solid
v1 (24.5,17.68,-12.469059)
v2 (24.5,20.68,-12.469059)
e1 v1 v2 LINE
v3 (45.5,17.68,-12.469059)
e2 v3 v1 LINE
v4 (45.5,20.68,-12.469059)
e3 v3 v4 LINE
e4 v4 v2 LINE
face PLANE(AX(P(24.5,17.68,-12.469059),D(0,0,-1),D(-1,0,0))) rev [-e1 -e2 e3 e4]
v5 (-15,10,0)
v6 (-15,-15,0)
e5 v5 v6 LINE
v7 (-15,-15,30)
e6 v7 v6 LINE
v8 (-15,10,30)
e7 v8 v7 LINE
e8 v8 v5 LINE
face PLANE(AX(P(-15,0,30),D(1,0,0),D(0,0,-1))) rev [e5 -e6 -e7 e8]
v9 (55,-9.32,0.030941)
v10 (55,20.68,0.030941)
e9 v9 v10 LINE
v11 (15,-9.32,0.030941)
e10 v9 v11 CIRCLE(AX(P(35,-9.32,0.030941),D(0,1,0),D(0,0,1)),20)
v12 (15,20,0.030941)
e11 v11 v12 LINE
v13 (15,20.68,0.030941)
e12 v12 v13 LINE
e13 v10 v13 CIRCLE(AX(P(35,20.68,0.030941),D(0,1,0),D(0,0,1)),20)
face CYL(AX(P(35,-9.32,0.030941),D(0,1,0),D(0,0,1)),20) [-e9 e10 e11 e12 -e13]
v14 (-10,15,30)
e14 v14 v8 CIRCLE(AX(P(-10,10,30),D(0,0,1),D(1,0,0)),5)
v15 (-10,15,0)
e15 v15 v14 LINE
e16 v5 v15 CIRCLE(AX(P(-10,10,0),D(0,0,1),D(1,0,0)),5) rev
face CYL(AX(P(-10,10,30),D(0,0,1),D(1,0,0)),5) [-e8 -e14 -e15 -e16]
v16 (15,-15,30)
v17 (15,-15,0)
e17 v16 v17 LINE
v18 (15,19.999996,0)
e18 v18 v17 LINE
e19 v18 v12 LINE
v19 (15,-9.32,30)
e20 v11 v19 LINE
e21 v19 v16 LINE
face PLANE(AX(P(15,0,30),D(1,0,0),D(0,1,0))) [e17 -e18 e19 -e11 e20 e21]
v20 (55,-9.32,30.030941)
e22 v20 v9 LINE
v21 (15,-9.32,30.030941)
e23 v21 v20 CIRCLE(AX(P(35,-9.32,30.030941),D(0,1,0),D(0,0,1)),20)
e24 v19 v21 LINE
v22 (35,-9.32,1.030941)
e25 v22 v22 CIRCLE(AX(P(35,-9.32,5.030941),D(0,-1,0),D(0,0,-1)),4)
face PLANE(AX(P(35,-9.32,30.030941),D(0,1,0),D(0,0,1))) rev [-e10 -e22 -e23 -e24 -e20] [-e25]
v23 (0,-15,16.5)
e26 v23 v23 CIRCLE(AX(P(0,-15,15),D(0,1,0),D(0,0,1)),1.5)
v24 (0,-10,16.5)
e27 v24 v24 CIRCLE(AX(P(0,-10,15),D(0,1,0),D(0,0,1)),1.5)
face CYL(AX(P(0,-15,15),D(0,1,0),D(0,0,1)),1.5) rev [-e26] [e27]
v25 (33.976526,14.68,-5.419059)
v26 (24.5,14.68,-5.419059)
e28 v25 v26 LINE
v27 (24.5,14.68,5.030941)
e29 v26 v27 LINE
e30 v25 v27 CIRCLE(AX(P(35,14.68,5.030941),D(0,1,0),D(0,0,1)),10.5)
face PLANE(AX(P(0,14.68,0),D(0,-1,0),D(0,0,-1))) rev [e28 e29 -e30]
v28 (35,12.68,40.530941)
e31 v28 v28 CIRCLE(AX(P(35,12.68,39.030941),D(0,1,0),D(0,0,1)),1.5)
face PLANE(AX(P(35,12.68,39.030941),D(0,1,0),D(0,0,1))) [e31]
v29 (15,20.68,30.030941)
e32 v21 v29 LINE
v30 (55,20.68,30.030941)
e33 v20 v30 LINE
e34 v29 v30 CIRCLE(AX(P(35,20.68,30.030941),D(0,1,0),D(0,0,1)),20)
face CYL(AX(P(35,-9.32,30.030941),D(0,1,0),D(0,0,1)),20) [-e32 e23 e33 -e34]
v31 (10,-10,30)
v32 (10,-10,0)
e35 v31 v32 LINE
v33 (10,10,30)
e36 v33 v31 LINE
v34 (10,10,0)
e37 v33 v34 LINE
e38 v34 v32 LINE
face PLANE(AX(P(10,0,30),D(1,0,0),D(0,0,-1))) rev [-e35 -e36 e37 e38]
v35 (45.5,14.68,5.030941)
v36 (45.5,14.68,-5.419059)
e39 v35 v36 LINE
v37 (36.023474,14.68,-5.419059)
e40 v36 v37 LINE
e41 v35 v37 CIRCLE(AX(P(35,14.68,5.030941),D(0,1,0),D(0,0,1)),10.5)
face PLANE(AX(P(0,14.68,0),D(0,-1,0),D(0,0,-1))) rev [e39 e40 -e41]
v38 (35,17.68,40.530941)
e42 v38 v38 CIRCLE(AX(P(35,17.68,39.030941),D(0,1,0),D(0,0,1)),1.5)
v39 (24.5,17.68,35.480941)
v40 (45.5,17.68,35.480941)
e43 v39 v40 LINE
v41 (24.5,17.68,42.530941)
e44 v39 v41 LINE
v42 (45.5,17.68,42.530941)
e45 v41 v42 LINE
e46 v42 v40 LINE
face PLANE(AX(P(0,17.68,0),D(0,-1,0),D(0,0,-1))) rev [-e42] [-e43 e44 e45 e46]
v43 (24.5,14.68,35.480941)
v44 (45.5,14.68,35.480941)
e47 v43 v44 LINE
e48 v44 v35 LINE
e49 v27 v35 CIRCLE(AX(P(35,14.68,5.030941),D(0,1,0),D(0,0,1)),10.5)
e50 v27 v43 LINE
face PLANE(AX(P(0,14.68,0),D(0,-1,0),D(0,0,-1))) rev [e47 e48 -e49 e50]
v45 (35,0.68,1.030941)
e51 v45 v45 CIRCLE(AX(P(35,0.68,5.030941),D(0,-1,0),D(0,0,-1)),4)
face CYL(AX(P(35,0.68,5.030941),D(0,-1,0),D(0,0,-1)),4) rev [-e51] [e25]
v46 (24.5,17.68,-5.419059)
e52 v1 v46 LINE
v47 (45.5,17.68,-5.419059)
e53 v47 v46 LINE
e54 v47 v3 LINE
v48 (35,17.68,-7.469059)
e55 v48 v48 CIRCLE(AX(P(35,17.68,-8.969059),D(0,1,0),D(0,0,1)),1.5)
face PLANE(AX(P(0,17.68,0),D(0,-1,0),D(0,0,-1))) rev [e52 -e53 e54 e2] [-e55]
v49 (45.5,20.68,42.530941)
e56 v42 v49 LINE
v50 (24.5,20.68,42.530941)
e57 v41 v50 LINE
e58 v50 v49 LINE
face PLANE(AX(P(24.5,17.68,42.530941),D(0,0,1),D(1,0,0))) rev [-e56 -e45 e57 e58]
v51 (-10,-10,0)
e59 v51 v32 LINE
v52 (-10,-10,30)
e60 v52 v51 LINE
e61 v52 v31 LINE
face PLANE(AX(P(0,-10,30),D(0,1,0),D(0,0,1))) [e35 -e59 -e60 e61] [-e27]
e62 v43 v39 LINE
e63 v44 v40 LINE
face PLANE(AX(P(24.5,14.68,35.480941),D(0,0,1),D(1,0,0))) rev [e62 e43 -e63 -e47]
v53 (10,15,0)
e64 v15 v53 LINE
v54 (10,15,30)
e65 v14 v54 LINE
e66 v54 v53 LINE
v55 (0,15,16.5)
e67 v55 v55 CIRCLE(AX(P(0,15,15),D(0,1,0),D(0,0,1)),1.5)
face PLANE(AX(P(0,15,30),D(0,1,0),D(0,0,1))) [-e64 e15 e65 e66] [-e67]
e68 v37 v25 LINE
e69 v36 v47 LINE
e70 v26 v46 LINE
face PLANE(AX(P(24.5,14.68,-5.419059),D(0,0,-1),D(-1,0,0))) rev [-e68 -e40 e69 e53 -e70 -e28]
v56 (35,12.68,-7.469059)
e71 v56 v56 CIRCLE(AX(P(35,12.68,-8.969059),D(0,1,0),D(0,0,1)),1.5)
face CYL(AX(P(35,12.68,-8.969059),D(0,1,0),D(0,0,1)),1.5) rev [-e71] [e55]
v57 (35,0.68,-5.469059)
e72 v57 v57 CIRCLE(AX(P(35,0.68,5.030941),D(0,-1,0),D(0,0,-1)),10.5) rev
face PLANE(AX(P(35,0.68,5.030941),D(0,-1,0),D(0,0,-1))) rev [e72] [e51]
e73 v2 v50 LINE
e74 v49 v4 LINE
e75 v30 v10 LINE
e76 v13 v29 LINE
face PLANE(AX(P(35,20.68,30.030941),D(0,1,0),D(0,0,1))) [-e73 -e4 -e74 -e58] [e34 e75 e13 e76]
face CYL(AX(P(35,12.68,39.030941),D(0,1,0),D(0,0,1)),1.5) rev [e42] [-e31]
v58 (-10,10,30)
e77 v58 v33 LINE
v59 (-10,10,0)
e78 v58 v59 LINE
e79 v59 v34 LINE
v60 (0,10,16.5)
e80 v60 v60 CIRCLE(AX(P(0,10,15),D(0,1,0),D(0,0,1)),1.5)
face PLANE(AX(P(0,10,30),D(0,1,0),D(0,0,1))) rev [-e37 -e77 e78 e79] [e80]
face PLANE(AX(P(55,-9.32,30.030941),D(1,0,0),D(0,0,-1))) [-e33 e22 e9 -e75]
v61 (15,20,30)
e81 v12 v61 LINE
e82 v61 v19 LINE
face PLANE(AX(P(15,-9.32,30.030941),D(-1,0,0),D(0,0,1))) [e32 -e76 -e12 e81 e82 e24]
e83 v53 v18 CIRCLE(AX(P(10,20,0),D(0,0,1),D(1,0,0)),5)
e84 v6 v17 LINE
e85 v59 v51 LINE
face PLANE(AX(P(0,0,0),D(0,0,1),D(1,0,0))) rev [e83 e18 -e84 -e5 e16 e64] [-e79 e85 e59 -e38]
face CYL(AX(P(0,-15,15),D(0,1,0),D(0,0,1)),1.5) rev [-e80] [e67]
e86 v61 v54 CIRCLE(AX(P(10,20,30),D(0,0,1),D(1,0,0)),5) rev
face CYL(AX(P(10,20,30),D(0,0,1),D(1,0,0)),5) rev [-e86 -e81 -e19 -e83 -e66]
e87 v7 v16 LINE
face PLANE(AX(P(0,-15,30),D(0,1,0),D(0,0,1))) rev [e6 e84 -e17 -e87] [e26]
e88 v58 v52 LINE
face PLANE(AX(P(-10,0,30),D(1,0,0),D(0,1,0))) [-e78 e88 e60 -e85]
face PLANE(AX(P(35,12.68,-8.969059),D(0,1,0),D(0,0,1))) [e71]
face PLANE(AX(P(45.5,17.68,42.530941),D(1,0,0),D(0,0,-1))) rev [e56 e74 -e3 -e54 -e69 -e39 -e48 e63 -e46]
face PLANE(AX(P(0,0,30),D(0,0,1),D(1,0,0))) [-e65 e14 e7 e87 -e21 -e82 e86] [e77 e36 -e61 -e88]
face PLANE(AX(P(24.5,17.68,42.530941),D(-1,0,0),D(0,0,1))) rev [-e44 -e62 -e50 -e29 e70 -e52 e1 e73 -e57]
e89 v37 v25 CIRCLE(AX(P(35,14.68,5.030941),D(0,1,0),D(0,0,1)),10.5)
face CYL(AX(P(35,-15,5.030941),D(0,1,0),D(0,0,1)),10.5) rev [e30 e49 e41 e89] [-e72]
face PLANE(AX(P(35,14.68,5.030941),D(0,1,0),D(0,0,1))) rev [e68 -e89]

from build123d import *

# Parameters (mm, degrees)
SKETCH1_W           = 30
SKETCH1_H           = 30
SKETCH1_W_2         = 20
SKETCH1_H_2         = 20
BOSS_EXTRUDE2_DEPTH = 30
BOSS_EXTRUDE3_DEPTH = 30
SKETCH6_W           = 21
SKETCH6_H           = 55
CUT_EXTRUDE1_DEPTH  = 3
SKETCH7_R           = 1.5
CUT_EXTRUDE2_DEPTH  = 5
SKETCH8_W           = 21
SKETCH8_H           = 40.9
CUT_EXTRUDE3_DEPTH  = 3
SKETCH9_R           = 10.5
CUT_EXTRUDE4_DEPTH  = 81.056214629
BOSS_EXTRUDE4_START = -10
SKETCH10_R          = 10.5
SKETCH10_R_2        = 4
BOSS_EXTRUDE4_DEPTH = 10
FILLET1_DEPTH       = 30
FILLET1_2_DEPTH     = 30
SKETCH11_R          = 1.5
CUT_EXTRUDE6_DEPTH  = 81.175402093


with BuildPart() as part:
    # Sketch1 → Boss-Extrude2 (new body)
    with BuildSketch(Plane.XY):
        Rectangle(SKETCH1_W, SKETCH1_H)
        Rectangle(SKETCH1_W_2, SKETCH1_H_2, mode=Mode.SUBTRACT)
    extrude(amount=BOSS_EXTRUDE2_DEPTH)

    # Sketch5 → Boss-Extrude3 (add)
    with BuildSketch(Plane(origin=(0, 20.68, 0), x_dir=(1, 0, 0), z_dir=(0, 1, 0))):
        with BuildLine():
            Line((15, -30.030941434), (15, -0.030941434))
            ThreePointArc((15, -0.030941434), (35, 19.969058566), (55, -0.030941434))
            Line((55, -0.030941434), (55, -30.030941434))
            ThreePointArc((55, -30.030941434), (35, -50.030941434), (15, -30.030941434))
        make_face()
    extrude(amount=-BOSS_EXTRUDE3_DEPTH)

    # Sketch6 → Cut-Extrude1 (cut)
    with BuildSketch(Plane(origin=(0, 20.68, 0), x_dir=(1, 0, 0), z_dir=(0, 1, 0))):
        with Locations((35, -15.030941434)):
            Rectangle(SKETCH6_W, SKETCH6_H)
    extrude(amount=-CUT_EXTRUDE1_DEPTH, mode=Mode.SUBTRACT)

    # Sketch7 → Cut-Extrude2 (cut)
    with BuildSketch(Plane(origin=(0, 17.68, 0), x_dir=(1, 0, 0), z_dir=(0, 1, 0))):
        with Locations(Location((35, -39.030941434, 0), (0, 0, 270))):
            Circle(SKETCH7_R)
        with Locations(Location((35, 8.969058566, 0), (0, 0, 270))):
            Circle(SKETCH7_R)
    extrude(amount=-CUT_EXTRUDE2_DEPTH, mode=Mode.SUBTRACT)

    # Sketch8 → Cut-Extrude3 (cut)
    with BuildSketch(Plane(origin=(0, 17.68, 0), x_dir=(1, 0, 0), z_dir=(0, 1, 0))):
        with Locations((35, -15.030941434)):
            Rectangle(SKETCH8_W, SKETCH8_H)
    extrude(amount=-CUT_EXTRUDE3_DEPTH, mode=Mode.SUBTRACT)

    # Sketch9 → Cut-Extrude4 (cut, through all)
    with BuildSketch(Plane(origin=(0, 14.68, 0), x_dir=(1, 0, 0), z_dir=(0, 1, 0))):
        with Locations(Location((35, -5.030941434, 0), (0, 0, 270))):
            Circle(SKETCH9_R)
    extrude(amount=-CUT_EXTRUDE4_DEPTH, mode=Mode.SUBTRACT)

    # Sketch10 → Boss-Extrude4 (add)
    with BuildSketch(Plane.XZ.offset(9.32).offset(BOSS_EXTRUDE4_START)):
        with Locations(Location((35, 5.030941434, 0), (0, 0, 180))):
            Circle(SKETCH10_R)
        with Locations(Location((35, 5.030941434, 0), (0, 0, 270))):
            Circle(SKETCH10_R_2, mode=Mode.SUBTRACT)
    extrude(amount=BOSS_EXTRUDE4_DEPTH)

    # Fillet1: read off the stored shape, not the designer's step
    # Fillet1 outline → Fillet1 (cut)
    with BuildSketch(Plane.XY):
        with BuildLine():
            ThreePointArc((-15, 10), (-13.535533906, 13.535533906), (-10, 15))
            Line((-10, 15), (-15, 15))
            Line((-15, 15), (-15, 10))
        make_face()
    extrude(amount=FILLET1_DEPTH, mode=Mode.SUBTRACT)

    # Fillet1 2 outline → Fillet1 2 (add)
    with BuildSketch(Plane.XY):
        with BuildLine():
            ThreePointArc((15, 20), (13.535533906, 16.464466094), (10, 15))
            Line((10, 15), (15, 15))
            Line((15, 15), (15, 20))
        make_face()
    extrude(amount=FILLET1_2_DEPTH)

    # Sketch11 → Cut-Extrude6 (cut, through all)
    with BuildSketch(Plane(origin=(0, 15, 0), x_dir=(1, 0, 0), z_dir=(0, 1, 0))):
        with Locations(Location((0, -15, 0), (0, 0, 270))):
            Circle(SKETCH11_R)
    extrude(amount=-CUT_EXTRUDE6_DEPTH, mode=Mode.SUBTRACT)


solid = part.part
